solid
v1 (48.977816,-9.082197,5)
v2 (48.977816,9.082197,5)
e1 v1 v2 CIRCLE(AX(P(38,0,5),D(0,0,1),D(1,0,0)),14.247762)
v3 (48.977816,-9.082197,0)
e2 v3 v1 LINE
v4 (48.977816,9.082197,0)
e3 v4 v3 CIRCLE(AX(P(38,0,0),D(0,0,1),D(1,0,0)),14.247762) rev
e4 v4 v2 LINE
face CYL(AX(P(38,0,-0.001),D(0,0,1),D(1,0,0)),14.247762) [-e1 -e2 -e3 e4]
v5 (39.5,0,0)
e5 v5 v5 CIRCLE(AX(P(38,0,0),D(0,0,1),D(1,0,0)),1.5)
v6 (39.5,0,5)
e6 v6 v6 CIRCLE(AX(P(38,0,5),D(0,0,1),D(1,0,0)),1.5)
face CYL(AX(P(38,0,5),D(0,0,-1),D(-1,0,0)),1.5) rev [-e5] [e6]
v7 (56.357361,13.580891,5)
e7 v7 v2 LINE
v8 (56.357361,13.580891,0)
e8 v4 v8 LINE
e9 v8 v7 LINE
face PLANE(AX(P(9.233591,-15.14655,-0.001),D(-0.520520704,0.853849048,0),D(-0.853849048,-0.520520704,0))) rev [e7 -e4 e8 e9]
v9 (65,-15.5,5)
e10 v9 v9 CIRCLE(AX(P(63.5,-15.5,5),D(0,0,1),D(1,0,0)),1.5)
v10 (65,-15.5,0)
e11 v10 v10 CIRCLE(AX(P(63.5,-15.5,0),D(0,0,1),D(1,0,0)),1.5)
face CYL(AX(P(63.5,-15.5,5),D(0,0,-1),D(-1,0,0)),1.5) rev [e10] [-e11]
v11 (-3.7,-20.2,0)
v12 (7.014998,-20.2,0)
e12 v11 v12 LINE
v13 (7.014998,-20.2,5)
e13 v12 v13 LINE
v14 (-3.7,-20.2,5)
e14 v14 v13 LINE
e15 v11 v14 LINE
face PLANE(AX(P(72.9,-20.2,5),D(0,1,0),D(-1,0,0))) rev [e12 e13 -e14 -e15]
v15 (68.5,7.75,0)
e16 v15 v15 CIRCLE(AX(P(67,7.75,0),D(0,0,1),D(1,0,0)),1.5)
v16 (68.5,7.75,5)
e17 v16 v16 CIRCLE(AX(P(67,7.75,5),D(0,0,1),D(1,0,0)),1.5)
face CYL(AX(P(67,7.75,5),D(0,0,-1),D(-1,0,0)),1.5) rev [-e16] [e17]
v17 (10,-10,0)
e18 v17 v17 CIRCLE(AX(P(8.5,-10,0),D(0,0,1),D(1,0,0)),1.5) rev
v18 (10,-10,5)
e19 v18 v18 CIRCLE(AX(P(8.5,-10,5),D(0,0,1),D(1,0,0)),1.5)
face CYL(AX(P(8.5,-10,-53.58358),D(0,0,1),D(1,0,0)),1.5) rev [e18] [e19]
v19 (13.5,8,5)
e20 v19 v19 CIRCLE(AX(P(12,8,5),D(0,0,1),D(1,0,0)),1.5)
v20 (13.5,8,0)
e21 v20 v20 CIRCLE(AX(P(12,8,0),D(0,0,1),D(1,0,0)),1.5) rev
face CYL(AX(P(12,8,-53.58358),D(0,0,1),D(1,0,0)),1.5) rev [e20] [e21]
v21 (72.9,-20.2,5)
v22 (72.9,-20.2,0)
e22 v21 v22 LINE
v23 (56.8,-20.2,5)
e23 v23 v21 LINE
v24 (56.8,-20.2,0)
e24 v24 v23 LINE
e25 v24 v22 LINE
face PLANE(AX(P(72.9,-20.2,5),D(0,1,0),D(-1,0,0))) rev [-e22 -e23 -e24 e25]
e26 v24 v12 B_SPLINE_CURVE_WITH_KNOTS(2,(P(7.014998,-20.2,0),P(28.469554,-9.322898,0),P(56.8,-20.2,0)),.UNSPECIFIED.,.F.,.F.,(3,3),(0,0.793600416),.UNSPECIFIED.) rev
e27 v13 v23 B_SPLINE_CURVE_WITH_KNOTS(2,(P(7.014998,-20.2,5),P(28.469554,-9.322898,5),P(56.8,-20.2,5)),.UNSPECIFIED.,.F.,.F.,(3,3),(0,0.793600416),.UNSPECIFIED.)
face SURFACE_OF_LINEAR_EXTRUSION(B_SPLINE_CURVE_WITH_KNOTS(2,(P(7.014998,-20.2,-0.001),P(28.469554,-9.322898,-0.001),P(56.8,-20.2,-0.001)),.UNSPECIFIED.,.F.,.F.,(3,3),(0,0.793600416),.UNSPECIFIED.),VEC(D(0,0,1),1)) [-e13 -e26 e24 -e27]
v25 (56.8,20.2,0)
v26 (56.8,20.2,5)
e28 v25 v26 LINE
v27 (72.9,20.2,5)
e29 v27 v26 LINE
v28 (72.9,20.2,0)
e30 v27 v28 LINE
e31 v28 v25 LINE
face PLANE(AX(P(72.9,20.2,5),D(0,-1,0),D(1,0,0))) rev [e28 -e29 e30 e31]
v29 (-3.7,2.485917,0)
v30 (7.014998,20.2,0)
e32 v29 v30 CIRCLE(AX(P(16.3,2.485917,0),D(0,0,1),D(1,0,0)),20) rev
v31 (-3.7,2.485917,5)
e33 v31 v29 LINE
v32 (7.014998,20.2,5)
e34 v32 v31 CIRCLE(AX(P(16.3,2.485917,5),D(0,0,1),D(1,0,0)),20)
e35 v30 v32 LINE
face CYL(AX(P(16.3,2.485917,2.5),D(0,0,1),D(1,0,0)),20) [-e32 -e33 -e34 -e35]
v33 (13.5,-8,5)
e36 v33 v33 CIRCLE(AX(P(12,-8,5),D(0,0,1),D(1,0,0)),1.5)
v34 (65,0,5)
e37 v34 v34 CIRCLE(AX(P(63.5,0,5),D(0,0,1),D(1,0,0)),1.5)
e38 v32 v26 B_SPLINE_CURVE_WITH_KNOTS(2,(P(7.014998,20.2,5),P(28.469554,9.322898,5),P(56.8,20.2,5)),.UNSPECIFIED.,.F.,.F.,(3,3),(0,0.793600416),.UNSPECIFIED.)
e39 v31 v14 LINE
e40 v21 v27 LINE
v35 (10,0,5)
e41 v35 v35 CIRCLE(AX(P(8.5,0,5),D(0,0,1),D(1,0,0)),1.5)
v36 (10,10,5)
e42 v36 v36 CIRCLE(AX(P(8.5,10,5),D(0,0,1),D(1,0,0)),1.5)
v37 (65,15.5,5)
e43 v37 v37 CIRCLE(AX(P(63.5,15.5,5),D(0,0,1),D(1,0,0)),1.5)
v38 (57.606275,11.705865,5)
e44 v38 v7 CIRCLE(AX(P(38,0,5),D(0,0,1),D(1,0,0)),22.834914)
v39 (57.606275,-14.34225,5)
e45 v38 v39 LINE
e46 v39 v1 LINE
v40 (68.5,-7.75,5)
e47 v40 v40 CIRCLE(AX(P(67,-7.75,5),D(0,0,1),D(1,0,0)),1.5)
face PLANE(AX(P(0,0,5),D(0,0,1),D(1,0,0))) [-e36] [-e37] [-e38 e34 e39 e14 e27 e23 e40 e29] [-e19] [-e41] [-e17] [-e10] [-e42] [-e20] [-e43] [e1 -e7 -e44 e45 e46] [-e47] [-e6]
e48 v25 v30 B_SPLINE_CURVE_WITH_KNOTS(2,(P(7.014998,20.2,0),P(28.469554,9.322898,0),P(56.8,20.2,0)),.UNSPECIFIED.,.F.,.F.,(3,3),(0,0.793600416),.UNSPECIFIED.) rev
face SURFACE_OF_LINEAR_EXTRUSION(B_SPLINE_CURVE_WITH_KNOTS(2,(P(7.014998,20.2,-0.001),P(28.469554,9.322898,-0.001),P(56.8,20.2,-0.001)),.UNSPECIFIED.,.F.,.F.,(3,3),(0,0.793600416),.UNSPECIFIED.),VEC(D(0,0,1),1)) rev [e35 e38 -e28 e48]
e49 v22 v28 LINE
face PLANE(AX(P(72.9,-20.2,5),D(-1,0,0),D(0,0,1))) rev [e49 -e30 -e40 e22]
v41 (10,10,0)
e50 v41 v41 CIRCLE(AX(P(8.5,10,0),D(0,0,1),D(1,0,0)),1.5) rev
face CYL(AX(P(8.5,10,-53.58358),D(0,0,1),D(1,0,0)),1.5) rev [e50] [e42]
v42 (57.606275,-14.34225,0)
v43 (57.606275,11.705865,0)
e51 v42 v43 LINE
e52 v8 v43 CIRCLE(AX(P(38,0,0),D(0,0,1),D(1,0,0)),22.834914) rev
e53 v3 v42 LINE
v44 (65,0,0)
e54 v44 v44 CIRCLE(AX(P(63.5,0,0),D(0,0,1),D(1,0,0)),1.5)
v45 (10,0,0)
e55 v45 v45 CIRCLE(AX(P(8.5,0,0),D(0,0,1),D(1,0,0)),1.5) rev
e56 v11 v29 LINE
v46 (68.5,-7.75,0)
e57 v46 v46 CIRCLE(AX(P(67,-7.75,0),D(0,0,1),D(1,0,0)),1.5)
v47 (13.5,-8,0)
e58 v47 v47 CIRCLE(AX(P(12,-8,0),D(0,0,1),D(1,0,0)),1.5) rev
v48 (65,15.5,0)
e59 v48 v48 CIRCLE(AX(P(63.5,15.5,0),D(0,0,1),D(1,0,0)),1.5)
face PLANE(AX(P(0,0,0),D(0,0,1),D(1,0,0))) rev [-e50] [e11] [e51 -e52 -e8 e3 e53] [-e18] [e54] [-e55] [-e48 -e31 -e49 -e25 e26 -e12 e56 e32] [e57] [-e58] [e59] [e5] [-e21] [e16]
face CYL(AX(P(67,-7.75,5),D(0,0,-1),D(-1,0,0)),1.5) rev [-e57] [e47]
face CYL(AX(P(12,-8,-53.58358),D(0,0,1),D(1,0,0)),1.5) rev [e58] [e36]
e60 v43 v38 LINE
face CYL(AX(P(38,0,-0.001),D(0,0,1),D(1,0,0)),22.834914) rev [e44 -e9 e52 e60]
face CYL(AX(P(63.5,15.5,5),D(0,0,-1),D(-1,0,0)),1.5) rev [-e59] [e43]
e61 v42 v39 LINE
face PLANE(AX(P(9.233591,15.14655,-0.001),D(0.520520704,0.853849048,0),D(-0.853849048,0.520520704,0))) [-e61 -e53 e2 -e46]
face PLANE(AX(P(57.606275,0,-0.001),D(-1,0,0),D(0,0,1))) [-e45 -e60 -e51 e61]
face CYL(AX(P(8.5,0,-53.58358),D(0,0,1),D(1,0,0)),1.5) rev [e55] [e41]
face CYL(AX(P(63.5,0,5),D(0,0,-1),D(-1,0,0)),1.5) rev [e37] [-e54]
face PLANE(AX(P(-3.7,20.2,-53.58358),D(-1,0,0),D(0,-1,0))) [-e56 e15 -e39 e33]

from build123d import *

# Parameters (mm, degrees)
CROQUIS1_W              = 41.4
CROQUIS1_H              = 40.4
CROQUIS1_R              = 1.5
SALIENTE_EXTRUIR1_DEPTH = 5
CROQUIS3_W              = 35.2
CROQUIS3_H              = 40.4
CROQUIS3_R              = 1.5
SALIENTE_EXTRUIR3_DEPTH = 5
CORTAR_EXTRUIR1_REACH   = 77.812
REDONDEO1_R             = 20
CORTAR_EXTRUIR2_REACH   = 77.812


with BuildPart() as part:
    # Croquis1 → Saliente-Extruir1 (new body)
    with BuildSketch(Plane.XY):
        with Locations((52.2, 0)):
            Rectangle(CROQUIS1_W, CROQUIS1_H)
        with Locations((63.5, 0)):
            Circle(CROQUIS1_R, mode=Mode.SUBTRACT)
        with Locations((63.5, -15.5)):
            Circle(CROQUIS1_R, mode=Mode.SUBTRACT)
        with Locations((38, 0)):
            Circle(CROQUIS1_R, mode=Mode.SUBTRACT)
        with Locations((63.5, 15.5)):
            Circle(CROQUIS1_R, mode=Mode.SUBTRACT)
        with Locations((67, -7.75)):
            Circle(CROQUIS1_R, mode=Mode.SUBTRACT)
        with Locations((67, 7.75)):
            Circle(CROQUIS1_R, mode=Mode.SUBTRACT)
    extrude(amount=SALIENTE_EXTRUIR1_DEPTH)

    # Croquis3 → Saliente-Extruir3 (add)
    with BuildSketch(Plane.XY.offset(5)):
        with Locations((13.9, 0)):
            Rectangle(CROQUIS3_W, CROQUIS3_H)
        with Locations((8.5, 0)):
            Circle(CROQUIS3_R, mode=Mode.SUBTRACT)
        with Locations((8.5, -10)):
            Circle(CROQUIS3_R, mode=Mode.SUBTRACT)
        with Locations((8.5, 10)):
            Circle(CROQUIS3_R, mode=Mode.SUBTRACT)
        with Locations((12, 8)):
            Circle(CROQUIS3_R, mode=Mode.SUBTRACT)
        with Locations((12, -8)):
            Circle(CROQUIS3_R, mode=Mode.SUBTRACT)
    extrude(amount=-SALIENTE_EXTRUIR3_DEPTH)

    # Croquis5 → Cortar-Extruir1 (cut, up to next)
    with BuildSketch(Plane.XY.offset(5), mode=Mode.PRIVATE) as cortar_extruir1_sk1:
        with BuildLine():
            Line((7.014997686, 20.2), (56.8, 20.2))
            add(Edge.make_bspline(
                [(56.8, 20.2), (28.469554023, 9.322898051), (7.014997686, 20.2)],
                knots=[0, 0, 0, 0.793600416, 0.793600416, 0.793600416], degree=2))
        make_face()
    cortar_extruir1_tool1 = extrude(cortar_extruir1_sk1.sketch, amount=-CORTAR_EXTRUIR1_REACH, mode=Mode.PRIVATE) & part.part
    cortar_extruir1 = cortar_extruir1_tool1.solids().sort_by_distance((31.21991, 18.02458, 5))[0]
    add(cortar_extruir1, mode=Mode.SUBTRACT)

    # Simetría1: Cortar-Extruir1 across plane
    add(cortar_extruir1.mirror(Plane.ZX), mode=Mode.SUBTRACT)

    # Redondeo1
    # the kernel refuses this fillet: 20 mm, written as the material it takes off along each edge
    with BuildSketch(Plane(origin=(-3.7, 20.2, 49.285207182), x_dir=(1, 0, 0), z_dir=(0, 0, -1))) as redondeo1_piece_1:
        with BuildLine():
            CenterArc((20, 17.714082873), REDONDEO1_R, 180, 62.338298383)
            Line((0, 17.714082873), (-0.4, 17.714082873))
            Line((-0.4, 17.714082873), (-0.4, 0))
            Line((-0.4, 0), (0, -0.4))
            ThreePointArc((0, -0.4), (5.357498843, -0.4), (10.52929764, -0.354281657))
            Line((10.52929764, -0.354281657), (10.714997686, 0))
        make_face()
    extrude(amount=93.570414364, mode=Mode.SUBTRACT)

    # Croquis6 → Cortar-Extruir2 (cut, up to next)
    with BuildSketch(Plane.XY.offset(5), mode=Mode.PRIVATE) as cortar_extruir2_sk1:
        with BuildLine():
            ThreePointArc((57.606275, 11.70586502), (57.004955729, 12.658789554), (56.35736085, 13.580890908))
            Line((56.35736085, 13.580890908), (48.977815911, 9.082196509))
            ThreePointArc((48.977815911, 9.082196509), (52.247762477, 0), (48.977815911, -9.082196509))
            Line((48.977815911, -9.082196509), (57.606275, -14.342249927))
            Line((57.606275, -14.342249927), (57.606275, 11.70586502))
        make_face()
    cortar_extruir2_tool1 = extrude(cortar_extruir2_sk1.sketch, amount=-CORTAR_EXTRUIR2_REACH, mode=Mode.PRIVATE) & part.part
    add(cortar_extruir2_tool1.solids().sort_by_distance((54.420947, -0.132696, 5))[0], mode=Mode.SUBTRACT)


solid = part.part
